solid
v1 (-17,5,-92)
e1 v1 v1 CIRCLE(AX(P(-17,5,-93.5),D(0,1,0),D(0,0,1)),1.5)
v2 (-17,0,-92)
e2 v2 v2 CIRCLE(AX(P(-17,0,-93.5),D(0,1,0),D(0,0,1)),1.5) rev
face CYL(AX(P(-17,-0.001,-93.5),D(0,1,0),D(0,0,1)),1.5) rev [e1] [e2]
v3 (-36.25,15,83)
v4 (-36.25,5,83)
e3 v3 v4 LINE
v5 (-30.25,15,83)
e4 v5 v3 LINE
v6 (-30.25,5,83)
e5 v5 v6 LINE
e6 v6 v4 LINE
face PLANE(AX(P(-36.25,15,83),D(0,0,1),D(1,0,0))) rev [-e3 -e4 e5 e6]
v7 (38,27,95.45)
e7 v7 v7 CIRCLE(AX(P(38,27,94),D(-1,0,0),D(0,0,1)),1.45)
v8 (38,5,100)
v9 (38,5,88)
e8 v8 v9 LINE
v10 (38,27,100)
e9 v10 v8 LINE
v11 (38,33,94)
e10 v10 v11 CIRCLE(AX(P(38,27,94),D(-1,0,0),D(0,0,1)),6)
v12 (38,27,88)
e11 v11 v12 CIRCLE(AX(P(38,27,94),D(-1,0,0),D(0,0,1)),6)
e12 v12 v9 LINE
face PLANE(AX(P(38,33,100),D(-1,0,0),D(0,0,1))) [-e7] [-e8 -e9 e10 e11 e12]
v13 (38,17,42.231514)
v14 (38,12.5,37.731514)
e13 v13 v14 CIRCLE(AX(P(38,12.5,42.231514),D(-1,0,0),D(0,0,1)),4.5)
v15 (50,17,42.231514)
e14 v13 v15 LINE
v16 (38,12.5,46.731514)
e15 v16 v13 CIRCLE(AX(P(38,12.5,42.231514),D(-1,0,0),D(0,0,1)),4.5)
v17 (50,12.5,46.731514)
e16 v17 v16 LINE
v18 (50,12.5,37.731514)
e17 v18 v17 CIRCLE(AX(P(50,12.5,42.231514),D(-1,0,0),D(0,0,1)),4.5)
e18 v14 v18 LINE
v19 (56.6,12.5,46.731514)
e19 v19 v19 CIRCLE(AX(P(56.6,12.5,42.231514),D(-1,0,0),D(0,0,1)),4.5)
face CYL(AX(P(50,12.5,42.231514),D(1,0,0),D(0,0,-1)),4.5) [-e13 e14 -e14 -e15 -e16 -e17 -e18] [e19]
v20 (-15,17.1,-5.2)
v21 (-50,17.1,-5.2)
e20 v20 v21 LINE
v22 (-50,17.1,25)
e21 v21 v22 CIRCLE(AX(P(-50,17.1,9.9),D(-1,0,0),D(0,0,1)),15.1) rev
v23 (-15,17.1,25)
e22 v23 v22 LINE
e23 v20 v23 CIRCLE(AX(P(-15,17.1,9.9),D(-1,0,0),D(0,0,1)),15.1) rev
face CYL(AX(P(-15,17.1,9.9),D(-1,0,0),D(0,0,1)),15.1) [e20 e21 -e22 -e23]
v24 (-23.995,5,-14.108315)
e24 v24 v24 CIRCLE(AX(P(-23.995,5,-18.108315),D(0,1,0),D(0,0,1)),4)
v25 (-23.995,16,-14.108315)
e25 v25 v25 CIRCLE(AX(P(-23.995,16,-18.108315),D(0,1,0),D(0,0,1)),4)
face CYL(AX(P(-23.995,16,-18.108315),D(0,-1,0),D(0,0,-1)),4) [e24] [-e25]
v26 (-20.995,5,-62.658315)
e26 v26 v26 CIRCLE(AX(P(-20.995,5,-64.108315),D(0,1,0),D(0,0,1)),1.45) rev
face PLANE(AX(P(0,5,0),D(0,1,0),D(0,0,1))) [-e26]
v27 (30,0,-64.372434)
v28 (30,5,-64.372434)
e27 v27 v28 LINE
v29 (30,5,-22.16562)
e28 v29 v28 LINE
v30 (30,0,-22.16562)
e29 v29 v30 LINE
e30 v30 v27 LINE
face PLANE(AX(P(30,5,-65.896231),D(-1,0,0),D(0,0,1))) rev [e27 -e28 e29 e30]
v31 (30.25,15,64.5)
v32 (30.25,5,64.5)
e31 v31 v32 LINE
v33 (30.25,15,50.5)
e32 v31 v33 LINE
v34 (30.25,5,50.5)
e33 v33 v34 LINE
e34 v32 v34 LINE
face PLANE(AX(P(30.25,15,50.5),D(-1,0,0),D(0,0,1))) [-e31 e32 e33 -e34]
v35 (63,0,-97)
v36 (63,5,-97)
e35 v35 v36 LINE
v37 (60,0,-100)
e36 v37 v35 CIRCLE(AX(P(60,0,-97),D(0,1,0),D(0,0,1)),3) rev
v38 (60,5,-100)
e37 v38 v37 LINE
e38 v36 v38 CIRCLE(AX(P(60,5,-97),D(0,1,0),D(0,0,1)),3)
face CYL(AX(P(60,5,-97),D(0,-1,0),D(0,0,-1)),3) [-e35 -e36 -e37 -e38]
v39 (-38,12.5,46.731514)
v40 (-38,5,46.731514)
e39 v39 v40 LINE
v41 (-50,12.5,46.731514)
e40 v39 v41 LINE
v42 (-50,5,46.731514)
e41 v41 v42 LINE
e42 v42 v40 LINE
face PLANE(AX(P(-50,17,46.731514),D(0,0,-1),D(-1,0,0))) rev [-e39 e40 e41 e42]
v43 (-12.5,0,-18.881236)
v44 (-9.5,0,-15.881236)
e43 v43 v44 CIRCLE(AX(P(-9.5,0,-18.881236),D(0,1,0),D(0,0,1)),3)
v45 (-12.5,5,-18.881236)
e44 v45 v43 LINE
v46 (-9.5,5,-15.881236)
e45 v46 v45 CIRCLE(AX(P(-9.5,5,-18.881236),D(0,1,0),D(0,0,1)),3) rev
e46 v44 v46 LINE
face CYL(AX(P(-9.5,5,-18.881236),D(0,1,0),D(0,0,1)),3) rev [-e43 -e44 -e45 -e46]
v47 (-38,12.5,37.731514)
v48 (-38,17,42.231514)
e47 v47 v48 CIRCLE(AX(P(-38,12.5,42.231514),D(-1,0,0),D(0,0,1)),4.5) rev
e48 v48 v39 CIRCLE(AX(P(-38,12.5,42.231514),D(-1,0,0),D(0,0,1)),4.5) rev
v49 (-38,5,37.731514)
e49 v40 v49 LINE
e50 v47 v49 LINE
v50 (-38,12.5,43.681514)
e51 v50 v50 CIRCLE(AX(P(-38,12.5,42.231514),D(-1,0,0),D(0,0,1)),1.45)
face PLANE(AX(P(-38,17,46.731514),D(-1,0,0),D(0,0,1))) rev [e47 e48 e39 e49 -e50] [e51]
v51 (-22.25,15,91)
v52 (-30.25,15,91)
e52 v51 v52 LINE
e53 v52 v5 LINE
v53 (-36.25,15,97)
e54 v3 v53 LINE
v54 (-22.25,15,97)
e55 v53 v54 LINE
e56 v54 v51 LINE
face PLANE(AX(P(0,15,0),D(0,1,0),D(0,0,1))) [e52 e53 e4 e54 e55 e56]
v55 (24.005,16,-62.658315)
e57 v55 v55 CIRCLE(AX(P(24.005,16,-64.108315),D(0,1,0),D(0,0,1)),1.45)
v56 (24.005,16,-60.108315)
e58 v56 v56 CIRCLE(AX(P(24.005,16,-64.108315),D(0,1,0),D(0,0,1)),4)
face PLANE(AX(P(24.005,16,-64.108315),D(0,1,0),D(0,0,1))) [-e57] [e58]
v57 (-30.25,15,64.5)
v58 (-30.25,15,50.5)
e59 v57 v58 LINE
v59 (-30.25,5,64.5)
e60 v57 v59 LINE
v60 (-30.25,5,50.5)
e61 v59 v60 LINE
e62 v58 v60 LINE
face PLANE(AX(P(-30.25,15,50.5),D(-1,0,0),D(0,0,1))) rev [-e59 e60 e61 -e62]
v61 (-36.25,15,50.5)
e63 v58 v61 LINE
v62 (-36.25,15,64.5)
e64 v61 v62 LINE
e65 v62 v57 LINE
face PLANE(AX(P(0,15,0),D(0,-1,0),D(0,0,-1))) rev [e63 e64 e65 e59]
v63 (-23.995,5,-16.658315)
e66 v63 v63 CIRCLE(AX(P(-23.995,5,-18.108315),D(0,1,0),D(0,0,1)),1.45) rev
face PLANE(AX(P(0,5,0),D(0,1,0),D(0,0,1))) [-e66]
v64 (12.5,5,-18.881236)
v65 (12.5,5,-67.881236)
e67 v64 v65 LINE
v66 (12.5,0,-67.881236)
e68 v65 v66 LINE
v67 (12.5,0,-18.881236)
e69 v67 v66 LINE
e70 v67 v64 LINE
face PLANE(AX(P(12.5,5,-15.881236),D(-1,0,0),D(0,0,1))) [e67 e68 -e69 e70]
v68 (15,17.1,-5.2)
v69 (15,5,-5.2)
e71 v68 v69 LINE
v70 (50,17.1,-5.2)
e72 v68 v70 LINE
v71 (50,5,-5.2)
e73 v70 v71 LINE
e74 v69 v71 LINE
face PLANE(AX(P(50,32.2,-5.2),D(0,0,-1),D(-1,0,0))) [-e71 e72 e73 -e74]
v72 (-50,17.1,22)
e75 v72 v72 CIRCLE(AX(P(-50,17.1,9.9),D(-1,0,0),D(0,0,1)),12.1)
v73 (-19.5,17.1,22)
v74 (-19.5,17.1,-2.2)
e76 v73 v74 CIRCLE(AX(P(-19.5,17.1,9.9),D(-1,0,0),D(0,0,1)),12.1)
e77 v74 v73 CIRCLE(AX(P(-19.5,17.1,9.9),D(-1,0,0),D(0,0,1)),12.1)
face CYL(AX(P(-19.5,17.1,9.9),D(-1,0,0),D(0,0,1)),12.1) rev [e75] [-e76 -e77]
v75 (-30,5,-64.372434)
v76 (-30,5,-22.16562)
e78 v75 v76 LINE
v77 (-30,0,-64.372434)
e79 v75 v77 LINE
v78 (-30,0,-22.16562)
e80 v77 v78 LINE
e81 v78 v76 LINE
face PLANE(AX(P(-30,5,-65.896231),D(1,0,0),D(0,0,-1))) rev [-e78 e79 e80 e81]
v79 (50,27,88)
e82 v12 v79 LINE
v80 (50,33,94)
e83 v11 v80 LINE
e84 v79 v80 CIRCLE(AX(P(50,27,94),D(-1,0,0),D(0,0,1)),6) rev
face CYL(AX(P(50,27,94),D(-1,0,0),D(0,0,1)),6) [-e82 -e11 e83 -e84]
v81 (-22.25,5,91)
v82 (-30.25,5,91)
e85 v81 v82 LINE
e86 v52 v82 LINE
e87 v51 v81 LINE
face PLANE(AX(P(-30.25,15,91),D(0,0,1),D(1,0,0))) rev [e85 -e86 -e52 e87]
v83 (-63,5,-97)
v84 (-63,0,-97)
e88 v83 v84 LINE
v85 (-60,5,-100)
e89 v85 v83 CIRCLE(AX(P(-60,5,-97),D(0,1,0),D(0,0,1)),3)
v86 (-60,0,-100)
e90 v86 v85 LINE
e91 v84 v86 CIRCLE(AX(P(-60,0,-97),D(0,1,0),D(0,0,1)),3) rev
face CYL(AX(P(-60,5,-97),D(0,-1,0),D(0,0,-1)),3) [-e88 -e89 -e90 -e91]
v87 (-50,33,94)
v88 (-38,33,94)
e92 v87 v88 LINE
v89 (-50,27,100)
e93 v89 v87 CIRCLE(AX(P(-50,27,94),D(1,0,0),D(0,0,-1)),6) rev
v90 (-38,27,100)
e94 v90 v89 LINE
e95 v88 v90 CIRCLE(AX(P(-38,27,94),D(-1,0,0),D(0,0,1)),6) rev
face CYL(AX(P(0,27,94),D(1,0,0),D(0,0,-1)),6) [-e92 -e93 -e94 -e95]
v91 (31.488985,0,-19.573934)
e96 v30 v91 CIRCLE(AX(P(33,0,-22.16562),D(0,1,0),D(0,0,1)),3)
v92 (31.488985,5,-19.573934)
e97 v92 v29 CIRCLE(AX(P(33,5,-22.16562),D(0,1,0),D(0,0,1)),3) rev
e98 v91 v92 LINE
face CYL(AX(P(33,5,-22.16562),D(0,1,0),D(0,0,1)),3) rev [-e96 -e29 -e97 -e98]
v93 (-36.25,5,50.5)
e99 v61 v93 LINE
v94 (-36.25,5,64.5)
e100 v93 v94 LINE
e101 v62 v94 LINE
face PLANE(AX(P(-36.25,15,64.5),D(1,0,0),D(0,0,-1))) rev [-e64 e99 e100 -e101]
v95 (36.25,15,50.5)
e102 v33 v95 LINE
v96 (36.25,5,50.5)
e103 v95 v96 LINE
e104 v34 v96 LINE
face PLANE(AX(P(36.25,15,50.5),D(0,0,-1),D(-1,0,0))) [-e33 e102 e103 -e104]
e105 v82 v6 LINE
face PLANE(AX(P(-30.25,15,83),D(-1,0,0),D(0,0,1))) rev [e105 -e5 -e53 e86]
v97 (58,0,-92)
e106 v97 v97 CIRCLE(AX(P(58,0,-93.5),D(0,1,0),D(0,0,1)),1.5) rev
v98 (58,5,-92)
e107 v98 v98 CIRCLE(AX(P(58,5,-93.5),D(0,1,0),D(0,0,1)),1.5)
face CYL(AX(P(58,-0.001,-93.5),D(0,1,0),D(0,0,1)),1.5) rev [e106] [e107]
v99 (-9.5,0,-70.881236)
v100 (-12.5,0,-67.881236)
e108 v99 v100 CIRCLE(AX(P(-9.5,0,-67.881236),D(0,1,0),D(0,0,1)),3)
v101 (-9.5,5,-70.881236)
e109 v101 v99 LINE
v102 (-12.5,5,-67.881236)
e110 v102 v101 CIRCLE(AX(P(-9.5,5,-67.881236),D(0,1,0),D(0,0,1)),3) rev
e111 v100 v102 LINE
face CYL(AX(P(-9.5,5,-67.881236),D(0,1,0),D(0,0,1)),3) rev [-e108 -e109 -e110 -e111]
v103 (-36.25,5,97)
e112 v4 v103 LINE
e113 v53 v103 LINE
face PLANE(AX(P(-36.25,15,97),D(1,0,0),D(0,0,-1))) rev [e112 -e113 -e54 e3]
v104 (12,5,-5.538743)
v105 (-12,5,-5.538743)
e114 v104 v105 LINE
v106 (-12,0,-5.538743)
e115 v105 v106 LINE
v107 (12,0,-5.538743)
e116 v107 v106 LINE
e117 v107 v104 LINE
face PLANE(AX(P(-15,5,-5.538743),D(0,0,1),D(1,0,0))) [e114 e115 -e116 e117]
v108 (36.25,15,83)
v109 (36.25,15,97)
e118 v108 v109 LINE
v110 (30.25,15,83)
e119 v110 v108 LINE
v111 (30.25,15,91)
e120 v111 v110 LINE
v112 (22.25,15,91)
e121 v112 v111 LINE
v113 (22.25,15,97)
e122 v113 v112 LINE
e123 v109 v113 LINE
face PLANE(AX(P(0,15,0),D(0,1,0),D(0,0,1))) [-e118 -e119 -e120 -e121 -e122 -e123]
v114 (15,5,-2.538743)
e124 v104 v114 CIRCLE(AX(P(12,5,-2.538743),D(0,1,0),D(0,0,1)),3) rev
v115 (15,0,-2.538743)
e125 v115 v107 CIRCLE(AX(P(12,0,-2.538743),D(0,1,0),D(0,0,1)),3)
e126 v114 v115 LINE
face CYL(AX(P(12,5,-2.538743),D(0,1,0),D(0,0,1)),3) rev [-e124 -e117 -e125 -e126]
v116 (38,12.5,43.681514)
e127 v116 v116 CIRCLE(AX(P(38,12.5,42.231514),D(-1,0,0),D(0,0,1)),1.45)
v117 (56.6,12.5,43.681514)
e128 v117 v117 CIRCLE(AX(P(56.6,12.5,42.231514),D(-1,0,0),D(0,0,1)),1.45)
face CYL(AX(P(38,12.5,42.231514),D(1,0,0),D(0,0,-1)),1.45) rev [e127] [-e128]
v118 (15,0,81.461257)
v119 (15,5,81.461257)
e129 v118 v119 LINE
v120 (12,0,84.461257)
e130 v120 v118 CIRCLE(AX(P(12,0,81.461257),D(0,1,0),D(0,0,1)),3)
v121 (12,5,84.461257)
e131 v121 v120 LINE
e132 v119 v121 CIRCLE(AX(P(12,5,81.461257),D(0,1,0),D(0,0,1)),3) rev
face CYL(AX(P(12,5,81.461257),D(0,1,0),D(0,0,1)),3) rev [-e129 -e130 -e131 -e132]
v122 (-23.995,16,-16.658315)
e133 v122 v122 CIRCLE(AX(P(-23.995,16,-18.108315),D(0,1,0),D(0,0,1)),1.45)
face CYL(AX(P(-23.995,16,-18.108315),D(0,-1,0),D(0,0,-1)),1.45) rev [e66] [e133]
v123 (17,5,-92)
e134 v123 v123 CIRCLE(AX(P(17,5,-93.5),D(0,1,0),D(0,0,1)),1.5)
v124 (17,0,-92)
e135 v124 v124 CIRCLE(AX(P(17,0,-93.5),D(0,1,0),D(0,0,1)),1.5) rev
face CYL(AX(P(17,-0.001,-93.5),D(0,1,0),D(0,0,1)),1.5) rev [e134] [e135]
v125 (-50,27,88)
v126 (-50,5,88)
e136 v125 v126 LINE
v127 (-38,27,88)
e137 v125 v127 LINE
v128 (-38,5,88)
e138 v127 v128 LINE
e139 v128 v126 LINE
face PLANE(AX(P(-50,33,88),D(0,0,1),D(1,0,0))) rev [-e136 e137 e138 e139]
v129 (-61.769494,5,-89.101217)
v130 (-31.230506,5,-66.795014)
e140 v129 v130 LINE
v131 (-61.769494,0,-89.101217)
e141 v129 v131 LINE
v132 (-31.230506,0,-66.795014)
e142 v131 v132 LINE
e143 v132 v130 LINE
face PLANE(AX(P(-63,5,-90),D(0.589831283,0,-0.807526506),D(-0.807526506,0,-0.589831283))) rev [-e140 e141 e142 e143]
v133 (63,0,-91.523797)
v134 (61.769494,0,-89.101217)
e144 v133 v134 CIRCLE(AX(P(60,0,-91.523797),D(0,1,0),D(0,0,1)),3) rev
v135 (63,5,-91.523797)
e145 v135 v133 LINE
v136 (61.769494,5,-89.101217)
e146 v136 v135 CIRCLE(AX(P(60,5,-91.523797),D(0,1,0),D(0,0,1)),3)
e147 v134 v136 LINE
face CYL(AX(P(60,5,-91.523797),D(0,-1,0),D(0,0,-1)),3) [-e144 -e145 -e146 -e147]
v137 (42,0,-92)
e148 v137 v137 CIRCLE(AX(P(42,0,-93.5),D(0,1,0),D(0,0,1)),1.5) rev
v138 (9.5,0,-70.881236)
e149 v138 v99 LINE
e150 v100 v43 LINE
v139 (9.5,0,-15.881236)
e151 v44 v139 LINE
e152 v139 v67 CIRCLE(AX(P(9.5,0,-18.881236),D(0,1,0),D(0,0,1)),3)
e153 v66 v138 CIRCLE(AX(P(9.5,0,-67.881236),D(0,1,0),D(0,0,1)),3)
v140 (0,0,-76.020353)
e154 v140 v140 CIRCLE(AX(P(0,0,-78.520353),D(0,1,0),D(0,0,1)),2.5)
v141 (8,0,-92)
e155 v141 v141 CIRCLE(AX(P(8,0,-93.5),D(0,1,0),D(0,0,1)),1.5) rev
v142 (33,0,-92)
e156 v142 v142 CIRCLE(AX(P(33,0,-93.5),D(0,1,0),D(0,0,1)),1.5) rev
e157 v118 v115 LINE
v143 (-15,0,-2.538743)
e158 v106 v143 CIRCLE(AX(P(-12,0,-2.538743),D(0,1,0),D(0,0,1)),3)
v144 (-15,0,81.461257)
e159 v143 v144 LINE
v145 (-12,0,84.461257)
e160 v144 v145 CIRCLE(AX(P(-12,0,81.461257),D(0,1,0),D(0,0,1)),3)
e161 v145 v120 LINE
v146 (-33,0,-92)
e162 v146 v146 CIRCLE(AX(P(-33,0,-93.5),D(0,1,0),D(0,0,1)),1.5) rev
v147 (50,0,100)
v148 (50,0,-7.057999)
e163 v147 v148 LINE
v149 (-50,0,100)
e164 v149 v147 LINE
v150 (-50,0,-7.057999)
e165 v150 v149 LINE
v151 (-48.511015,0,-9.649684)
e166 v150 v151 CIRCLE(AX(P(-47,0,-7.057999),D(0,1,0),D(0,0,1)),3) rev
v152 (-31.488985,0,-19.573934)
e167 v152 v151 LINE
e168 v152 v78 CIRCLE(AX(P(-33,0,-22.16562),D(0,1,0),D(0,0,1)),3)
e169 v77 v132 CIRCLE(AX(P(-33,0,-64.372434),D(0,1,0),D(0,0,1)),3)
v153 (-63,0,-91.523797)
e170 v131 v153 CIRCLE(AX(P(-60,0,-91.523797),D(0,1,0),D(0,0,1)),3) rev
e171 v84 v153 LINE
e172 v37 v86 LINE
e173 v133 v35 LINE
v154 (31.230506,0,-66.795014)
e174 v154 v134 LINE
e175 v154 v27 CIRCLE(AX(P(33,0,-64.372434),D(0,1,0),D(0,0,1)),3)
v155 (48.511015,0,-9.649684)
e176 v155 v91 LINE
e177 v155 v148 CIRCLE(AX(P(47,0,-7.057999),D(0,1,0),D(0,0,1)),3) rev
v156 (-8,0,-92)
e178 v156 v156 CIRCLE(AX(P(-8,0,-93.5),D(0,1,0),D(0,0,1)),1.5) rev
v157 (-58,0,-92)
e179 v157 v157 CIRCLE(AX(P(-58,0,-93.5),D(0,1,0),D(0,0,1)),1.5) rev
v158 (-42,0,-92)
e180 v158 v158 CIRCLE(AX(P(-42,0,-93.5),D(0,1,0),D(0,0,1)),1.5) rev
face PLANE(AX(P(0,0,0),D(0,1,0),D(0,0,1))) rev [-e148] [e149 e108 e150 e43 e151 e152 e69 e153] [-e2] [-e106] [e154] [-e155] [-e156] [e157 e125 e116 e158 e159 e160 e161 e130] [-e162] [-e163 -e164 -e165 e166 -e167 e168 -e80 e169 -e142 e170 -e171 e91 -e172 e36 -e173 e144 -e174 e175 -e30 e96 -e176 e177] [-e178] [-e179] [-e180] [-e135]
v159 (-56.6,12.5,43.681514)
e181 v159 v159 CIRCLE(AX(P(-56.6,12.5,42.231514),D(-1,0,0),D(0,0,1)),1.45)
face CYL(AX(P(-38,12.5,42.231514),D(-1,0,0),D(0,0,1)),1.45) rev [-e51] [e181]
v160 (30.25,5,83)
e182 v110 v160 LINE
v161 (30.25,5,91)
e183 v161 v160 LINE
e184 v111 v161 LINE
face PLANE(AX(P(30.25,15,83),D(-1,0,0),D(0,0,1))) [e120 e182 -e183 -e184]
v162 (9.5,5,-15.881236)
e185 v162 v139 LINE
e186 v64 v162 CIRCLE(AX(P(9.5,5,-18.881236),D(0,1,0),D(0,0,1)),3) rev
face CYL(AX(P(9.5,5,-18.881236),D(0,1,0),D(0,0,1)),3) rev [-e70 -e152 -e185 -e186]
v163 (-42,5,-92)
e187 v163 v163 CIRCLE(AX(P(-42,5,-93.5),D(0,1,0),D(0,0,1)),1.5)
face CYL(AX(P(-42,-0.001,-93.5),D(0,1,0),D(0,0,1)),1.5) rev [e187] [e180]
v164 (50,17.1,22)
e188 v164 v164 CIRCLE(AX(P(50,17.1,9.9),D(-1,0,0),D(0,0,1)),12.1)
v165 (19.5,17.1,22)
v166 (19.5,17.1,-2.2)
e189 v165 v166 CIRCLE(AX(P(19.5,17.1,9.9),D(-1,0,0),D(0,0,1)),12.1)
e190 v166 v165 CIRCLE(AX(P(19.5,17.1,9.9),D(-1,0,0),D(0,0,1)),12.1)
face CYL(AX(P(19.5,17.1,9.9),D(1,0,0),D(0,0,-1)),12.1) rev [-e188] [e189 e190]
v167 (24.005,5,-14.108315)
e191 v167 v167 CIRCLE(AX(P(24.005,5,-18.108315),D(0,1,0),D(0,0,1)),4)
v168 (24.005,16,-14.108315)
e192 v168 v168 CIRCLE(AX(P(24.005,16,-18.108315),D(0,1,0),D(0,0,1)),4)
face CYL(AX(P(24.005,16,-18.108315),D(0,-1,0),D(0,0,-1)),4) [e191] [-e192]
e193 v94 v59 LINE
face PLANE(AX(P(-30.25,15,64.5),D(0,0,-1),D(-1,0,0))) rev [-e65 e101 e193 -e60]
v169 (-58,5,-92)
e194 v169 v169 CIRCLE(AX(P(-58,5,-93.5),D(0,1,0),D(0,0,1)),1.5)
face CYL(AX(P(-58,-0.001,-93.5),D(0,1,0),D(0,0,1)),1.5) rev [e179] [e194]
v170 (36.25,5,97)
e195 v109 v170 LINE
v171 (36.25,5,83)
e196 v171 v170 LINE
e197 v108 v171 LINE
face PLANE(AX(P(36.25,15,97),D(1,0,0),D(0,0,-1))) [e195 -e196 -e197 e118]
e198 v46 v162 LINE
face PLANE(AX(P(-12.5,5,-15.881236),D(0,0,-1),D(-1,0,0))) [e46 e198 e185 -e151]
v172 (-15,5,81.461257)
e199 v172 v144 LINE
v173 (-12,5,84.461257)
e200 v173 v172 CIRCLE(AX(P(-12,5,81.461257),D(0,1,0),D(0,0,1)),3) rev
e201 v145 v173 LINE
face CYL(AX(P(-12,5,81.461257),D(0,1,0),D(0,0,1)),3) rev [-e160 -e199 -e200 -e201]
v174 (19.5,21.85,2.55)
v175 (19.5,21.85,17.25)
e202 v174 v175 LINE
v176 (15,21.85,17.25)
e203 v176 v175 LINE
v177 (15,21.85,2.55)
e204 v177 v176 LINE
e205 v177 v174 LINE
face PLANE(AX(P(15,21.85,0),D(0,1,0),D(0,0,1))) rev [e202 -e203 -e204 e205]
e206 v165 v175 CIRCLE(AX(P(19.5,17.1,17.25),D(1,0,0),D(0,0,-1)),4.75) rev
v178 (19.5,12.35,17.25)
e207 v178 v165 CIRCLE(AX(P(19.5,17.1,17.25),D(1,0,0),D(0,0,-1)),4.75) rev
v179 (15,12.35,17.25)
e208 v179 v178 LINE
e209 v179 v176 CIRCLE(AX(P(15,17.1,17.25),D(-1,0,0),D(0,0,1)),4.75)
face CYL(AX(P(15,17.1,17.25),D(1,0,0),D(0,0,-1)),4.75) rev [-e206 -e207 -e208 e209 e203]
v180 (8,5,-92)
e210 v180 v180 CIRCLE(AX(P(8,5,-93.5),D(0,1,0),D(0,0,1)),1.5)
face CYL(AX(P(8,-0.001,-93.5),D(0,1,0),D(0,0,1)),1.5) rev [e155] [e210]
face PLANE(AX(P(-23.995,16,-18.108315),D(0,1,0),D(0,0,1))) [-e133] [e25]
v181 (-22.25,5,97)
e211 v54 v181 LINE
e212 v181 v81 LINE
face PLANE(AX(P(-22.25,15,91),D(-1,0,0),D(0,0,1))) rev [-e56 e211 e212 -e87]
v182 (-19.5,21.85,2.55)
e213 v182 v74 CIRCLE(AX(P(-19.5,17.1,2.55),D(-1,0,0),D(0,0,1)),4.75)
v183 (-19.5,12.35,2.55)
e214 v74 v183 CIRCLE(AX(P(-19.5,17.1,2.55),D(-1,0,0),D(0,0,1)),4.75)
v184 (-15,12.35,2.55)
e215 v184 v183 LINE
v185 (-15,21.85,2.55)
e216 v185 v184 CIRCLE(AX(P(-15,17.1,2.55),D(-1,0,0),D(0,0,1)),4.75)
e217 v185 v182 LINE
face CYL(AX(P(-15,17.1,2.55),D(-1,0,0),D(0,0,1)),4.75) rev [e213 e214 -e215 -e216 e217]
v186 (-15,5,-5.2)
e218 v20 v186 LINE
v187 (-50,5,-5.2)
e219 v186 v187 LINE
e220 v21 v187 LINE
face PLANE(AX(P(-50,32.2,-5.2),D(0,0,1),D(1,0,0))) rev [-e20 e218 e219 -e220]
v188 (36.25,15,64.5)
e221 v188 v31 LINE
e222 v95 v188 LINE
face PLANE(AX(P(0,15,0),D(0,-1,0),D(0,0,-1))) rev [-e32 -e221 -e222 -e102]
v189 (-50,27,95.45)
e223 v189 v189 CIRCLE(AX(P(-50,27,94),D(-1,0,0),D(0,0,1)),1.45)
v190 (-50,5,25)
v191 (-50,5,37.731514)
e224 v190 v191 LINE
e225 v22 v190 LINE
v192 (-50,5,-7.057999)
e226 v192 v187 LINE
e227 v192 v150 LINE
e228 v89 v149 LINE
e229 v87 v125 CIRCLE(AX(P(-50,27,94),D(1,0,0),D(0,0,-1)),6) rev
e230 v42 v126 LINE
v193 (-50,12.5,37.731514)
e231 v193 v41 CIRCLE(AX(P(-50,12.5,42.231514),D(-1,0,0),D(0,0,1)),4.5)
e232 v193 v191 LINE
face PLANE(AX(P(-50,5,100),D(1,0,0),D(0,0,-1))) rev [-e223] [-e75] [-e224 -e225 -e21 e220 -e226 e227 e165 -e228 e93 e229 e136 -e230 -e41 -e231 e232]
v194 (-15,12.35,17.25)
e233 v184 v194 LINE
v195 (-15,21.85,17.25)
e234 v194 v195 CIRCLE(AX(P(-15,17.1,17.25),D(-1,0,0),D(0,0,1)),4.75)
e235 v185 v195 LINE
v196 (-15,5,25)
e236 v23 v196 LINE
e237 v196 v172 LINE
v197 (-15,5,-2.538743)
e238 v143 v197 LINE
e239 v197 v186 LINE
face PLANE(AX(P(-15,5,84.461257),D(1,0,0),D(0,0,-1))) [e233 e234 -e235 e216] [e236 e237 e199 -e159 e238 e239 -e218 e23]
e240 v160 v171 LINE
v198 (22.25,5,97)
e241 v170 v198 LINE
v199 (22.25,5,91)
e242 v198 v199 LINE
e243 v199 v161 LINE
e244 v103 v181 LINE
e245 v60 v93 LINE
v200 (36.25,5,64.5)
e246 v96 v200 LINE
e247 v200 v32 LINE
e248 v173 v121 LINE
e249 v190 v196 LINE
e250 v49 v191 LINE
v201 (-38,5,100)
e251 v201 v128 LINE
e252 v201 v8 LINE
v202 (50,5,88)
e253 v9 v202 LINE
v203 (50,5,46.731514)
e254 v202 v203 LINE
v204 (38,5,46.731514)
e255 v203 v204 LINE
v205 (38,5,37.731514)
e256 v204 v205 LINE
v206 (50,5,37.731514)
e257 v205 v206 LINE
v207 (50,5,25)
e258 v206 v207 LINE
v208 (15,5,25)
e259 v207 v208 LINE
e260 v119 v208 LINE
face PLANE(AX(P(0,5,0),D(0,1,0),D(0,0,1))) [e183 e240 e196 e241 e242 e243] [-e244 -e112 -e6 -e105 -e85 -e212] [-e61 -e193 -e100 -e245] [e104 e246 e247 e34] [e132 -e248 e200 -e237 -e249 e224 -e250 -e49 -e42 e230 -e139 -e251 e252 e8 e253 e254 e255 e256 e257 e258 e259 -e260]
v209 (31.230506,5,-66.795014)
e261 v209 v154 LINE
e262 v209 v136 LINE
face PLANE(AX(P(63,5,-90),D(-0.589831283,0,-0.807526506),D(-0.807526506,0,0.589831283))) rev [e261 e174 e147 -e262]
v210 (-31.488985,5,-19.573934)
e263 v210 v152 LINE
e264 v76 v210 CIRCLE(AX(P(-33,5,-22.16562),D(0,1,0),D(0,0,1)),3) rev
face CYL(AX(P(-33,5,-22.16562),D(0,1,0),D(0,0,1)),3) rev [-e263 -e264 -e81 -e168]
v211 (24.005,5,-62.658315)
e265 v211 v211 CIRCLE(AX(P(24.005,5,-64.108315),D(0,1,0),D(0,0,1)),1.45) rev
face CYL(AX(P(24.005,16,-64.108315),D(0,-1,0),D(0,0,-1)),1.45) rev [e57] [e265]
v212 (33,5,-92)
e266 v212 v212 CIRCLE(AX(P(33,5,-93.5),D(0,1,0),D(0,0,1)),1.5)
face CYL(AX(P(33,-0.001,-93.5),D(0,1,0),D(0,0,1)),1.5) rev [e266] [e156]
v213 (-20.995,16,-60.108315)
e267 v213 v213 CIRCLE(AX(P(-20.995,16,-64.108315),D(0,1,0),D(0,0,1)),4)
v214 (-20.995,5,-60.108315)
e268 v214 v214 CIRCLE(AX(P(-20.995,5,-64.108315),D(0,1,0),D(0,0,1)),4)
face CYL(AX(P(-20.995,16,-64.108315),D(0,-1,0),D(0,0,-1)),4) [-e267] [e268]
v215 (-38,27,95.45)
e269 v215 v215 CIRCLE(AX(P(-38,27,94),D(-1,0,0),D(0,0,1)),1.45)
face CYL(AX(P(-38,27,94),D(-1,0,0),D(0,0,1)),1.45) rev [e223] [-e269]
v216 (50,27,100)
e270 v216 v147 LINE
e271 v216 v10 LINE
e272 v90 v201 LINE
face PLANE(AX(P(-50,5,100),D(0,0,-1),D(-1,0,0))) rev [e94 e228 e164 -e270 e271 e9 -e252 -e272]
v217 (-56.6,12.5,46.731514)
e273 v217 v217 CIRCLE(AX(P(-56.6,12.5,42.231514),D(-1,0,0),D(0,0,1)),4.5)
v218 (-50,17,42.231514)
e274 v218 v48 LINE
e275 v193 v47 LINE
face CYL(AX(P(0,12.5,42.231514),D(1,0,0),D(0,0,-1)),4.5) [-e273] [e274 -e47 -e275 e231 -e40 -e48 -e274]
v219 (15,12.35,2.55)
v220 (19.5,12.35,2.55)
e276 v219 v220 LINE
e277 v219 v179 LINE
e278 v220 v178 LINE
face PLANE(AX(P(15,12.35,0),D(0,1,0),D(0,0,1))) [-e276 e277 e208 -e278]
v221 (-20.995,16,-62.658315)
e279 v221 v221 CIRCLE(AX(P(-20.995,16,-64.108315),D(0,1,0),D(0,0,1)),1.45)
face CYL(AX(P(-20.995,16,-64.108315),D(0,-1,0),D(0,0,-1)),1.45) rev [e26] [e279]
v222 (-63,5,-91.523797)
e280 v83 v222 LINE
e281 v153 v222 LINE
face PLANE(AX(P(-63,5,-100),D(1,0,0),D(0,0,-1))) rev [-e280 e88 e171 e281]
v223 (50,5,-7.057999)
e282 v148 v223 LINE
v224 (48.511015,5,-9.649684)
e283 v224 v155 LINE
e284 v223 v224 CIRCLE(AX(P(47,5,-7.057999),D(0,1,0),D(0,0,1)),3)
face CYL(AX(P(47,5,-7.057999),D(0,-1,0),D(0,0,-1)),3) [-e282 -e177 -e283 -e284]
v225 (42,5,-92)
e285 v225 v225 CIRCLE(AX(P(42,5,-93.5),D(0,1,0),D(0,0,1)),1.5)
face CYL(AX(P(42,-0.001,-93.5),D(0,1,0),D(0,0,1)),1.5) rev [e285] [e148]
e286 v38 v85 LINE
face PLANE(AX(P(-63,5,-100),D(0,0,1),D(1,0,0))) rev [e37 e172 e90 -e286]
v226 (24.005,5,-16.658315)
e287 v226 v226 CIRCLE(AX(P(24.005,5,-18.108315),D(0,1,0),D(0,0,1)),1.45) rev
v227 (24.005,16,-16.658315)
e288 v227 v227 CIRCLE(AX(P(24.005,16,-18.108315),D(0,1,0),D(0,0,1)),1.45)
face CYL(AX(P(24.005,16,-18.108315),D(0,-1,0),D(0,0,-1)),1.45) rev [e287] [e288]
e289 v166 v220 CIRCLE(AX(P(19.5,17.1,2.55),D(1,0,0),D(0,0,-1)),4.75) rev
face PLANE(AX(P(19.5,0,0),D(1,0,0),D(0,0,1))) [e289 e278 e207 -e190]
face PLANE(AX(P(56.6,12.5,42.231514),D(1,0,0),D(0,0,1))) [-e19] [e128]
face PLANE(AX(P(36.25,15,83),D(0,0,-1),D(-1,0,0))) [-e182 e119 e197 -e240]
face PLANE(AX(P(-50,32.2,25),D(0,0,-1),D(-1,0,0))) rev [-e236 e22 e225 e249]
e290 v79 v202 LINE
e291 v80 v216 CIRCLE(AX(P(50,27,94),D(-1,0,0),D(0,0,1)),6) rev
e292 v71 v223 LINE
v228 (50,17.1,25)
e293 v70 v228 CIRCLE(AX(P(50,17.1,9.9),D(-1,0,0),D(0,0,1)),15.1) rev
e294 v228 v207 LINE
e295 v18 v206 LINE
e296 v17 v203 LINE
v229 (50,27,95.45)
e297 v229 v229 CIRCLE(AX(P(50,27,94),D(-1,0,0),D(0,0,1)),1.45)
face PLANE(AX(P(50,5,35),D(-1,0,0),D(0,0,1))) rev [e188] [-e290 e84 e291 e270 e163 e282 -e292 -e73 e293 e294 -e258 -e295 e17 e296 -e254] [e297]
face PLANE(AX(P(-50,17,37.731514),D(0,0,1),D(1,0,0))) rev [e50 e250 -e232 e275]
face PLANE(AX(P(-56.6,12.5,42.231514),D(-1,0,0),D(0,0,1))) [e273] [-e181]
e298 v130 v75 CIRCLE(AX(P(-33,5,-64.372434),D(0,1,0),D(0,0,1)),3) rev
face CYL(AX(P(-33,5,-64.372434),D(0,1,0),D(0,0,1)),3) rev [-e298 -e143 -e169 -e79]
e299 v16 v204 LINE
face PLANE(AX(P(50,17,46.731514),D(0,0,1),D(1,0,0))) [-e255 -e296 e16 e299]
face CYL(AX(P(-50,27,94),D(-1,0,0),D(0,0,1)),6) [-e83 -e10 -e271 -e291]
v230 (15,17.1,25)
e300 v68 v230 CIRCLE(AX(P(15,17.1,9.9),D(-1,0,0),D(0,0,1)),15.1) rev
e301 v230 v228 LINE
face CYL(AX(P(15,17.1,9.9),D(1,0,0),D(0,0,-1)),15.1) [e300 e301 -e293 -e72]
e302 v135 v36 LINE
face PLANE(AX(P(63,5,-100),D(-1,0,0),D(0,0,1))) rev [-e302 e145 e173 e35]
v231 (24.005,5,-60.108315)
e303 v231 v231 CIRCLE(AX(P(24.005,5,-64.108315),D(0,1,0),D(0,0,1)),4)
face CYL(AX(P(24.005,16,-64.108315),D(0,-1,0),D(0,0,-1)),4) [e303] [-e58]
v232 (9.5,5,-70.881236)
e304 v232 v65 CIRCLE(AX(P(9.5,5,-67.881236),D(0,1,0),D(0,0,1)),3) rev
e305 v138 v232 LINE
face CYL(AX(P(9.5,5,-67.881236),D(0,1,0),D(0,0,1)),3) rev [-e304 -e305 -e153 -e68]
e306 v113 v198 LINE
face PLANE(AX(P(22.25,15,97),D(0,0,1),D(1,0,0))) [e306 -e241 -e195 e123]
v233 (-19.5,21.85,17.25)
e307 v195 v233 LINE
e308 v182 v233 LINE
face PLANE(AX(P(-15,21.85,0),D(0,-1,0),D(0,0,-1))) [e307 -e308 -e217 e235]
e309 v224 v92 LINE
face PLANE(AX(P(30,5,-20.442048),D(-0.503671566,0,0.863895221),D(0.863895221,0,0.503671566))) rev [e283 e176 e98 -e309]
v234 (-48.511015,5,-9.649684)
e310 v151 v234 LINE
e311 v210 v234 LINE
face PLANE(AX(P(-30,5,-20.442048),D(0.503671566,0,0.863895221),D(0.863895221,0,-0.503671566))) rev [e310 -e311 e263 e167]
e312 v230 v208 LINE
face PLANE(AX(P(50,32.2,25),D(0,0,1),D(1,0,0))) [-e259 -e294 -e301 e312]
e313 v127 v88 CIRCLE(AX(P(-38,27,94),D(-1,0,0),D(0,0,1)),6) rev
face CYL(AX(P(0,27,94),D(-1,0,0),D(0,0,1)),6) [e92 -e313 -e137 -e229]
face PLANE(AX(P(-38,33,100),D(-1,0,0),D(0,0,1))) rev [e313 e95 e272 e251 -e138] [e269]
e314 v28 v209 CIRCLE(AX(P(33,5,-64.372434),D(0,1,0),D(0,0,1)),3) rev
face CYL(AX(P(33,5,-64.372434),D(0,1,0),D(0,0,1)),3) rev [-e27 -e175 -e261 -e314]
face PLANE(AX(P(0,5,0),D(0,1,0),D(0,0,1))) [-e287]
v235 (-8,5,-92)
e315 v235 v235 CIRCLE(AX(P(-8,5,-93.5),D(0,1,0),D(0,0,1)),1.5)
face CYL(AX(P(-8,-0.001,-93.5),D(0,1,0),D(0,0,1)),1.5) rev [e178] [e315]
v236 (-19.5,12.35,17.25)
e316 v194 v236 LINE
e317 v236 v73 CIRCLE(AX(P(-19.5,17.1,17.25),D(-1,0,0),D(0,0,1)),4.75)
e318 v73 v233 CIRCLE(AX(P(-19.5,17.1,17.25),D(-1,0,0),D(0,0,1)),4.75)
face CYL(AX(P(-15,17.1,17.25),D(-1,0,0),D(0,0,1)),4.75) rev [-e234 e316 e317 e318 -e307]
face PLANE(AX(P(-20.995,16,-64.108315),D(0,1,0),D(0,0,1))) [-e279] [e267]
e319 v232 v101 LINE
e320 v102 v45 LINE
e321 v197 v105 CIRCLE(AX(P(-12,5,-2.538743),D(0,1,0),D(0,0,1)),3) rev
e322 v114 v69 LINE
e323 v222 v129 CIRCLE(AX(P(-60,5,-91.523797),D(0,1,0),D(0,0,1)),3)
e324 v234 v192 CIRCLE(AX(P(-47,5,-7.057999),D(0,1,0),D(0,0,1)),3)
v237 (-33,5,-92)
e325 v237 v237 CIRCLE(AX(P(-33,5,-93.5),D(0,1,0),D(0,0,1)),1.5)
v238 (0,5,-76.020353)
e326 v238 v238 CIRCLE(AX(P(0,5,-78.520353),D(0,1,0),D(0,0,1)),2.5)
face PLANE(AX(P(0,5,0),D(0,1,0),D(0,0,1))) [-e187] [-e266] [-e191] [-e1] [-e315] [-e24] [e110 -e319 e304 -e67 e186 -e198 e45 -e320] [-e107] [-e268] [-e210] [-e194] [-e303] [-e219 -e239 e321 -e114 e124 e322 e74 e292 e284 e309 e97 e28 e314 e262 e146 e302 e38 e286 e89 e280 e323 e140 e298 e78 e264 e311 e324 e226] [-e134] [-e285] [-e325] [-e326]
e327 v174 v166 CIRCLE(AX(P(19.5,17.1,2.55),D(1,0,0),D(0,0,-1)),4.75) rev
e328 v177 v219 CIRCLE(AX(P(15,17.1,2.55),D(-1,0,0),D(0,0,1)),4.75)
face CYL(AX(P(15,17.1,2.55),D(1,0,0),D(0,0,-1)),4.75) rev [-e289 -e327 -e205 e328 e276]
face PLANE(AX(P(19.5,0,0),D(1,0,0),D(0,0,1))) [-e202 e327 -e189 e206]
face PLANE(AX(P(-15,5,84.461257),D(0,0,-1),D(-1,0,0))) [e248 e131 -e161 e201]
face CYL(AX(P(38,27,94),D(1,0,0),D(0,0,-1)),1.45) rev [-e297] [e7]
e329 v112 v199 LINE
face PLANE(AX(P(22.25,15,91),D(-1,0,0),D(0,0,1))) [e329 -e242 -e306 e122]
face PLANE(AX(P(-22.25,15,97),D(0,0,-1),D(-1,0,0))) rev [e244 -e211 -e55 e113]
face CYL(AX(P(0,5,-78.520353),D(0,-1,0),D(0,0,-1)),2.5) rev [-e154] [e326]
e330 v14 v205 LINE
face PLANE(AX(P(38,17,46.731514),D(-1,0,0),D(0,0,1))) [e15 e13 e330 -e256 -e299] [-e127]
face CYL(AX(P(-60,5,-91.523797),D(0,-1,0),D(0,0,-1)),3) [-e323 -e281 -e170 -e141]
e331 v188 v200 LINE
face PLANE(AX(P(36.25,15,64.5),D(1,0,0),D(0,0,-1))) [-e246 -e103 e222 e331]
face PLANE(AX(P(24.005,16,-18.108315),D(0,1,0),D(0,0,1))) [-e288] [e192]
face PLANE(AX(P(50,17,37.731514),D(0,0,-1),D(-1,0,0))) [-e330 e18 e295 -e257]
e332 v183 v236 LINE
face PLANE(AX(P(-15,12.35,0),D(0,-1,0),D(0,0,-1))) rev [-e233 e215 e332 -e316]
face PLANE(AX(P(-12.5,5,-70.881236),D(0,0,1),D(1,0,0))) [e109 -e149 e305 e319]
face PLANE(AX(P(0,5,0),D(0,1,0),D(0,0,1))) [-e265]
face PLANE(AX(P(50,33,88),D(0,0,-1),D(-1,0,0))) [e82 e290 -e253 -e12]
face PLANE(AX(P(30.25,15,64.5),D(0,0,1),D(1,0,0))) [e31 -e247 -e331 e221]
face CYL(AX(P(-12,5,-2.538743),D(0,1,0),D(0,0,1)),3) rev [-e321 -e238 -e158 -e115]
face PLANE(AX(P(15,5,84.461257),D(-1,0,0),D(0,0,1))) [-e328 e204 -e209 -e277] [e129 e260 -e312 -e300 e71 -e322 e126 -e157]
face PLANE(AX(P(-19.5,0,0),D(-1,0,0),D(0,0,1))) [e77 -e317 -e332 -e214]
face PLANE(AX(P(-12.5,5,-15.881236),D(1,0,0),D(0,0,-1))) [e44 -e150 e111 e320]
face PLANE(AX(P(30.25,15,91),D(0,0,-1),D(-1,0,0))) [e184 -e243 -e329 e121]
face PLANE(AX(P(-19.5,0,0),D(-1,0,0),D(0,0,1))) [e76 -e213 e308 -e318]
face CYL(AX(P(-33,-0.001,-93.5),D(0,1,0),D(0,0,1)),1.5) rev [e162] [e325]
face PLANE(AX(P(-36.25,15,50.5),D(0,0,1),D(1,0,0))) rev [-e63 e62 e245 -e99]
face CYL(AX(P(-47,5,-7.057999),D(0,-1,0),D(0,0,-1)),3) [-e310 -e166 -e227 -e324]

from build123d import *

# Parameters (mm, degrees)
SKETCH1_R             = 2.5
SKETCH1_W             = 30
SKETCH1_H             = 90
SKETCH1_W_2           = 25
SKETCH1_H_2           = 55
BOSS_EXTRUDE1_DEPTH   = 5
FILLET1_R             = 3
SKETCH3_W             = 35
SKETCH3_H             = 30.2
BOSS_EXTRUDE2_DEPTH   = 27.2
CUT_EXTRUDE1_DEPTH    = 35
SKETCH4_3_R           = 12.1
CUT_EXTRUDE2_DEPTH    = 30.5
CUT_EXTRUDE3_DEPTH    = 35
SKETCH6_W             = 12
SKETCH6_H             = 9
BOSS_EXTRUDE3_DEPTH   = 12
FILLET2_R             = 4.5
SKETCH9_R             = 4.5
BOSS_EXTRUDE5_DEPTH   = 6.6
SKETCH10_R            = 1.45
CUT_EXTRUDE5_DEPTH    = 18.6
FILLET2_OF_MIRROR11_R = 4.5
SKETCH11_W            = 12
SKETCH11_H            = 12
BOSS_EXTRUDE6_DEPTH   = 28
FILLET3_R             = 6
SKETCH12_R            = 1.45
CUT_EXTRUDE6_DEPTH    = 12
FILLET3_OF_MIRROR12_R = 6
SKETCH13_R            = 4
SKETCH13_R_2          = 1.45
BOSS_EXTRUDE7_DEPTH   = 11
BOSS_EXTRUDE8_DEPTH   = 10
SKETCH16_W            = 6
SKETCH16_H            = 14
BOSS_EXTRUDE9_DEPTH   = 10
CUT_EXTRUDE7_REACH    = 123.462
SKETCH17_R            = 1.5


with BuildPart() as part:
    # Sketch1 → Boss-Extrude1 (new body)
    with BuildSketch(Plane(origin=(0, 0, 0), x_dir=(1, 0, 0), z_dir=(0, 1, 0))):
        Polygon((-50, -100), (50, -100), (50, -50), (50, -35), (50, 8.781570318), (30, 20.44204843), (30, 65.896231008), (63, 90), (63, 100), (50, 100), (-50, 100), (-63, 100), (-63, 90), (-30, 65.896231008), (-30, 20.44204843), (-50, 8.781570318), (-50, -35), (-50, -50), align=None)
        with Locations(Location((0, 78.520352636, 0), (0, 0, 270))):
            Circle(SKETCH1_R, mode=Mode.SUBTRACT)
        with Locations((0, -39.461257299)):
            Rectangle(SKETCH1_W, SKETCH1_H, mode=Mode.SUBTRACT)
        with Locations((0, 43.381236072)):
            Rectangle(SKETCH1_W_2, SKETCH1_H_2, mode=Mode.SUBTRACT)
    extrude(amount=BOSS_EXTRUDE1_DEPTH)

    # Fillet1
    fillet1_edges = [part.edges().sort_by_distance(p)[0] for p in [
        (63, 2.5, -100),
        (63, 2.5, -90),
        (30, 2.5, -65.896231008),
        (30, 2.5, -20.44204843),
        (50, 2.5, -8.781570318),
        (-50, 2.5, -8.781570318),
        (-30, 2.5, -20.44204843),
        (-30, 2.5, -65.896231008),
        (-63, 2.5, -90),
        (-63, 2.5, -100),
        (15, 2.5, 84.461257299),
        (15, 2.5, -5.538742701),
        (-15, 2.5, -5.538742701),
        (-15, 2.5, 84.461257299),
        (12.5, 2.5, -15.881236072),
        (12.5, 2.5, -70.881236072),
        (-12.5, 2.5, -70.881236072),
        (-12.5, 2.5, -15.881236072),
    ]]
    fillet(fillet1_edges, radius=FILLET1_R)

    # Sketch3 → Boss-Extrude2 (add)
    with BuildSketch(Plane(origin=(0, 5, 0), x_dir=(1, 0, 0), z_dir=(0, 1, 0))):
        with Locations((-32.5, -9.9)):
            Rectangle(SKETCH3_W, SKETCH3_H)
    boss_extrude2 = extrude(amount=BOSS_EXTRUDE2_DEPTH)

    # Sketch4 → Cut-Extrude1 (cut)
    with BuildSketch(Plane.ZY.offset(50)):
        with BuildLine():
            Line((-5.2, 32.2), (-5.2, 17.1))
            ThreePointArc((-5.2, 17.1), (-0.777312396, 27.777312396), (9.9, 32.2))
            Line((9.9, 32.2), (-5.2, 32.2))
        make_face()
        with BuildLine():
            Line((25, 32.2), (9.9, 32.2))
            ThreePointArc((9.9, 32.2), (20.577312396, 27.777312396), (25, 17.1))
            Line((25, 17.1), (25, 32.2))
        make_face()
    cut_extrude1 = extrude(amount=-CUT_EXTRUDE1_DEPTH, mode=Mode.SUBTRACT)

    # Sketch4<3> → Cut-Extrude2 (cut)
    with BuildSketch(Plane.ZY.offset(50)):
        with Locations((9.9, 17.1)):
            Circle(SKETCH4_3_R)
    cut_extrude2 = extrude(amount=-CUT_EXTRUDE2_DEPTH, mode=Mode.SUBTRACT)

    # Sketch4<4> → Cut-Extrude3 (cut)
    with BuildSketch(Plane.ZY.offset(50)):
        with BuildLine():
            Line((2.55, 21.85), (17.25, 21.85))
            ThreePointArc((17.25, 21.85), (22, 17.1), (17.25, 12.35))
            Line((17.25, 12.35), (2.55, 12.35))
            ThreePointArc((2.55, 12.35), (-2.2, 17.1), (2.55, 21.85))
        make_face()
    cut_extrude3 = extrude(amount=-CUT_EXTRUDE3_DEPTH, mode=Mode.SUBTRACT)

    # Mirror9: Boss-Extrude2, Cut-Extrude1, Cut-Extrude2, Cut-Extrude3 across plane
    add(boss_extrude2.mirror(Plane(origin=(0, 0, 0), x_dir=(0, 0, 1), z_dir=(1, 0, 0))))
    add(cut_extrude1.mirror(Plane(origin=(0, 0, 0), x_dir=(0, 0, 1), z_dir=(1, 0, 0))), mode=Mode.SUBTRACT)
    add(cut_extrude2.mirror(Plane(origin=(0, 0, 0), x_dir=(0, 0, 1), z_dir=(1, 0, 0))), mode=Mode.SUBTRACT)
    add(cut_extrude3.mirror(Plane(origin=(0, 0, 0), x_dir=(0, 0, 1), z_dir=(1, 0, 0))), mode=Mode.SUBTRACT)

    # Sketch6 → Boss-Extrude3 (add)
    with BuildSketch(Plane(origin=(0, 5, 0), x_dir=(1, 0, 0), z_dir=(0, 1, 0))):
        with Locations((-44, -42.231514294)):
            Rectangle(SKETCH6_W, SKETCH6_H)
    boss_extrude3 = extrude(amount=BOSS_EXTRUDE3_DEPTH)

    # Fillet2
    fillet2_edges = [part.edges().sort_by_distance(p)[0] for p in [
        (-44, 17, 37.731514294),
        (-44, 17, 46.731514294),
    ]]
    fillet(fillet2_edges, radius=FILLET2_R - 0.0001)  # a hair under: the kernel refuses the full size

    # Sketch9 → Boss-Extrude5 (add)
    with BuildSketch(Plane.ZY.offset(50)):
        with Locations((42.231514294, 12.5)):
            Circle(SKETCH9_R)
    boss_extrude5 = extrude(amount=BOSS_EXTRUDE5_DEPTH)

    # Sketch10 → Cut-Extrude5 (cut)
    with BuildSketch(Plane.ZY.offset(56.6)):
        with Locations((42.231514294, 12.5)):
            Circle(SKETCH10_R)
    cut_extrude5 = extrude(amount=-CUT_EXTRUDE5_DEPTH, mode=Mode.SUBTRACT)

    # Mirror11: Boss-Extrude3, Boss-Extrude5, Cut-Extrude5 across plane
    add(boss_extrude3.mirror(Plane(origin=(0, 0, 0), x_dir=(0, 0, 1), z_dir=(1, 0, 0))))
    add(boss_extrude5.mirror(Plane(origin=(0, 0, 0), x_dir=(0, 0, 1), z_dir=(1, 0, 0))))
    add(cut_extrude5.mirror(Plane(origin=(0, 0, 0), x_dir=(0, 0, 1), z_dir=(1, 0, 0))), mode=Mode.SUBTRACT)

    # Fillet2 of Mirror11
    fillet2_of_mirror11_edges = [part.edges().sort_by_distance(p)[0] for p in [
        (44, 17, 37.731514294),
        (44, 17, 46.731514294),
    ]]
    fillet(fillet2_of_mirror11_edges, radius=FILLET2_OF_MIRROR11_R - 0.0001)  # a hair under: the kernel refuses the full size

    # Sketch11 → Boss-Extrude6 (add)
    with BuildSketch(Plane(origin=(0, 5, 0), x_dir=(1, 0, 0), z_dir=(0, 1, 0))):
        with Locations((-44, -94)):
            Rectangle(SKETCH11_W, SKETCH11_H)
    boss_extrude6 = extrude(amount=BOSS_EXTRUDE6_DEPTH)

    # Fillet3
    fillet3_edges = [part.edges().sort_by_distance(p)[0] for p in [
        (-44, 33, 88),
        (-44, 33, 100),
    ]]
    fillet(fillet3_edges, radius=FILLET3_R - 0.0001)  # a hair under: the kernel refuses the full size

    # Sketch12 → Cut-Extrude6 (cut)
    with BuildSketch(Plane.ZY.offset(50)):
        with Locations((94, 27)):
            Circle(SKETCH12_R)
    cut_extrude6 = extrude(amount=-CUT_EXTRUDE6_DEPTH, mode=Mode.SUBTRACT)

    # Mirror12: Boss-Extrude6, Cut-Extrude6 across plane
    add(boss_extrude6.mirror(Plane(origin=(0, 0, 0), x_dir=(0, 0, 1), z_dir=(1, 0, 0))))
    add(cut_extrude6.mirror(Plane(origin=(0, 0, 0), x_dir=(0, 0, 1), z_dir=(1, 0, 0))), mode=Mode.SUBTRACT)

    # Fillet3 of Mirror12
    fillet3_of_mirror12_edges = [part.edges().sort_by_distance(p)[0] for p in [
        (44, 33, 88),
        (44, 33, 100),
    ]]
    fillet(fillet3_of_mirror12_edges, radius=FILLET3_OF_MIRROR12_R - 0.0001)  # a hair under: the kernel refuses the full size

    # Sketch13 → Boss-Extrude7 (add)
    # profile 1 of 4: a face of its own
    with BuildSketch(Plane(origin=(0, 5, 0), x_dir=(1, 0, 0), z_dir=(0, 1, 0))):
        with Locations(Location((-23.995, 18.108314646, 0), (0, 0, 270))):
            Circle(SKETCH13_R)
        with Locations(Location((-23.995, 18.108314646, 0), (0, 0, 270))):
            Circle(SKETCH13_R_2, mode=Mode.SUBTRACT)
    # profile 2 of 4: a face of its own
    with BuildSketch(Plane(origin=(0, 5, 0), x_dir=(1, 0, 0), z_dir=(0, 1, 0))):
        with Locations(Location((24.005, 18.108314646, 0), (0, 0, 270))):
            Circle(SKETCH13_R)
        with Locations(Location((24.005, 18.108314646, 0), (0, 0, 270))):
            Circle(SKETCH13_R_2, mode=Mode.SUBTRACT)
    # profile 3 of 4: a face of its own
    with BuildSketch(Plane(origin=(0, 5, 0), x_dir=(1, 0, 0), z_dir=(0, 1, 0))):
        with Locations(Location((-20.995, 64.108314646, 0), (0, 0, 270))):
            Circle(SKETCH13_R)
        with Locations(Location((-20.995, 64.108314646, 0), (0, 0, 270))):
            Circle(SKETCH13_R_2, mode=Mode.SUBTRACT)
    # profile 4 of 4: a face of its own
    with BuildSketch(Plane(origin=(0, 5, 0), x_dir=(1, 0, 0), z_dir=(0, 1, 0))):
        with Locations(Location((24.005, 64.108314646, 0), (0, 0, 270))):
            Circle(SKETCH13_R)
        with Locations(Location((24.005, 64.108314646, 0), (0, 0, 270))):
            Circle(SKETCH13_R_2, mode=Mode.SUBTRACT)
    extrude(amount=BOSS_EXTRUDE7_DEPTH)

    # Sketch15 → Boss-Extrude8 (add)
    with BuildSketch(Plane(origin=(0, 5, 0), x_dir=(1, 0, 0), z_dir=(0, 1, 0))):
        Polygon((-30.25, -91), (-22.25, -91), (-22.25, -97), (-36.25, -97), (-36.25, -83), (-30.25, -83), align=None)
    boss_extrude8 = extrude(amount=BOSS_EXTRUDE8_DEPTH)

    # Mirror13: Boss-Extrude8 across plane
    add(boss_extrude8.mirror(Plane(origin=(0, 0, 0), x_dir=(0, 0, 1), z_dir=(1, 0, 0))))

    # Sketch16 → Boss-Extrude9 (add)
    with BuildSketch(Plane(origin=(0, 5, 0), x_dir=(1, 0, 0), z_dir=(0, 1, 0))):
        with Locations((-33.25, -57.5)):
            Rectangle(SKETCH16_W, SKETCH16_H)
    boss_extrude9 = extrude(amount=BOSS_EXTRUDE9_DEPTH)

    # Mirror14: Boss-Extrude9 across plane
    add(boss_extrude9.mirror(Plane(origin=(0, 0, 0), x_dir=(0, 0, 1), z_dir=(1, 0, 0))))

    # Sketch17 → Cut-Extrude7 (cut, up to next)
    with BuildSketch(Plane(origin=(0, 5, 0), x_dir=(1, 0, 0), z_dir=(0, 1, 0)), mode=Mode.PRIVATE) as cut_extrude7_sk1:
        with Locations(Location((-58, 93.5, 0), (0, 0, 270))):
            Circle(SKETCH17_R)
    cut_extrude7_tool1 = extrude(cut_extrude7_sk1.sketch, amount=-CUT_EXTRUDE7_REACH, mode=Mode.PRIVATE) & part.part
    # Sketch17 → Cut-Extrude7 (cut, up to next)
    with BuildSketch(Plane(origin=(0, 5, 0), x_dir=(1, 0, 0), z_dir=(0, 1, 0)), mode=Mode.PRIVATE) as cut_extrude7_sk2:
        with Locations(Location((-42, 93.5, 0), (0, 0, 270))):
            Circle(SKETCH17_R)
    cut_extrude7_tool2 = extrude(cut_extrude7_sk2.sketch, amount=-CUT_EXTRUDE7_REACH, mode=Mode.PRIVATE) & part.part
    # Sketch17 → Cut-Extrude7 (cut, up to next)
    with BuildSketch(Plane(origin=(0, 5, 0), x_dir=(1, 0, 0), z_dir=(0, 1, 0)), mode=Mode.PRIVATE) as cut_extrude7_sk3:
        with Locations(Location((-33, 93.5, 0), (0, 0, 270))):
            Circle(SKETCH17_R)
    cut_extrude7_tool3 = extrude(cut_extrude7_sk3.sketch, amount=-CUT_EXTRUDE7_REACH, mode=Mode.PRIVATE) & part.part
    # Sketch17 → Cut-Extrude7 (cut, up to next)
    with BuildSketch(Plane(origin=(0, 5, 0), x_dir=(1, 0, 0), z_dir=(0, 1, 0)), mode=Mode.PRIVATE) as cut_extrude7_sk4:
        with Locations(Location((-17, 93.5, 0), (0, 0, 270))):
            Circle(SKETCH17_R)
    cut_extrude7_tool4 = extrude(cut_extrude7_sk4.sketch, amount=-CUT_EXTRUDE7_REACH, mode=Mode.PRIVATE) & part.part
    # Sketch17 → Cut-Extrude7 (cut, up to next)
    with BuildSketch(Plane(origin=(0, 5, 0), x_dir=(1, 0, 0), z_dir=(0, 1, 0)), mode=Mode.PRIVATE) as cut_extrude7_sk5:
        with Locations(Location((-8, 93.5, 0), (0, 0, 270))):
            Circle(SKETCH17_R)
    cut_extrude7_tool5 = extrude(cut_extrude7_sk5.sketch, amount=-CUT_EXTRUDE7_REACH, mode=Mode.PRIVATE) & part.part
    # Sketch17 → Cut-Extrude7 (cut, up to next)
    with BuildSketch(Plane(origin=(0, 5, 0), x_dir=(1, 0, 0), z_dir=(0, 1, 0)), mode=Mode.PRIVATE) as cut_extrude7_sk6:
        with Locations(Location((8, 93.5, 0), (0, 0, 270))):
            Circle(SKETCH17_R)
    cut_extrude7_tool6 = extrude(cut_extrude7_sk6.sketch, amount=-CUT_EXTRUDE7_REACH, mode=Mode.PRIVATE) & part.part
    # Sketch17 → Cut-Extrude7 (cut, up to next)
    with BuildSketch(Plane(origin=(0, 5, 0), x_dir=(1, 0, 0), z_dir=(0, 1, 0)), mode=Mode.PRIVATE) as cut_extrude7_sk7:
        with Locations(Location((17, 93.5, 0), (0, 0, 270))):
            Circle(SKETCH17_R)
    cut_extrude7_tool7 = extrude(cut_extrude7_sk7.sketch, amount=-CUT_EXTRUDE7_REACH, mode=Mode.PRIVATE) & part.part
    # Sketch17 → Cut-Extrude7 (cut, up to next)
    with BuildSketch(Plane(origin=(0, 5, 0), x_dir=(1, 0, 0), z_dir=(0, 1, 0)), mode=Mode.PRIVATE) as cut_extrude7_sk8:
        with Locations(Location((33, 93.5, 0), (0, 0, 270))):
            Circle(SKETCH17_R)
    cut_extrude7_tool8 = extrude(cut_extrude7_sk8.sketch, amount=-CUT_EXTRUDE7_REACH, mode=Mode.PRIVATE) & part.part
    # Sketch17 → Cut-Extrude7 (cut, up to next)
    with BuildSketch(Plane(origin=(0, 5, 0), x_dir=(1, 0, 0), z_dir=(0, 1, 0)), mode=Mode.PRIVATE) as cut_extrude7_sk9:
        with Locations(Location((42, 93.5, 0), (0, 0, 270))):
            Circle(SKETCH17_R)
    cut_extrude7_tool9 = extrude(cut_extrude7_sk9.sketch, amount=-CUT_EXTRUDE7_REACH, mode=Mode.PRIVATE) & part.part
    # Sketch17 → Cut-Extrude7 (cut, up to next)
    with BuildSketch(Plane(origin=(0, 5, 0), x_dir=(1, 0, 0), z_dir=(0, 1, 0)), mode=Mode.PRIVATE) as cut_extrude7_sk10:
        with Locations(Location((58, 93.5, 0), (0, 0, 270))):
            Circle(SKETCH17_R)
    cut_extrude7_tool10 = extrude(cut_extrude7_sk10.sketch, amount=-CUT_EXTRUDE7_REACH, mode=Mode.PRIVATE) & part.part
    add(cut_extrude7_tool1.solids().sort_by_distance((-58, 5, -93.5))[0], mode=Mode.SUBTRACT)
    add(cut_extrude7_tool2.solids().sort_by_distance((-42, 5, -93.5))[0], mode=Mode.SUBTRACT)
    add(cut_extrude7_tool3.solids().sort_by_distance((-33, 5, -93.5))[0], mode=Mode.SUBTRACT)
    add(cut_extrude7_tool4.solids().sort_by_distance((-17, 5, -93.5))[0], mode=Mode.SUBTRACT)
    add(cut_extrude7_tool5.solids().sort_by_distance((-8, 5, -93.5))[0], mode=Mode.SUBTRACT)
    add(cut_extrude7_tool6.solids().sort_by_distance((8, 5, -93.5))[0], mode=Mode.SUBTRACT)
    add(cut_extrude7_tool7.solids().sort_by_distance((17, 5, -93.5))[0], mode=Mode.SUBTRACT)
    add(cut_extrude7_tool8.solids().sort_by_distance((33, 5, -93.5))[0], mode=Mode.SUBTRACT)
    add(cut_extrude7_tool9.solids().sort_by_distance((42, 5, -93.5))[0], mode=Mode.SUBTRACT)
    add(cut_extrude7_tool10.solids().sort_by_distance((58, 5, -93.5))[0], mode=Mode.SUBTRACT)


solid = part.part
